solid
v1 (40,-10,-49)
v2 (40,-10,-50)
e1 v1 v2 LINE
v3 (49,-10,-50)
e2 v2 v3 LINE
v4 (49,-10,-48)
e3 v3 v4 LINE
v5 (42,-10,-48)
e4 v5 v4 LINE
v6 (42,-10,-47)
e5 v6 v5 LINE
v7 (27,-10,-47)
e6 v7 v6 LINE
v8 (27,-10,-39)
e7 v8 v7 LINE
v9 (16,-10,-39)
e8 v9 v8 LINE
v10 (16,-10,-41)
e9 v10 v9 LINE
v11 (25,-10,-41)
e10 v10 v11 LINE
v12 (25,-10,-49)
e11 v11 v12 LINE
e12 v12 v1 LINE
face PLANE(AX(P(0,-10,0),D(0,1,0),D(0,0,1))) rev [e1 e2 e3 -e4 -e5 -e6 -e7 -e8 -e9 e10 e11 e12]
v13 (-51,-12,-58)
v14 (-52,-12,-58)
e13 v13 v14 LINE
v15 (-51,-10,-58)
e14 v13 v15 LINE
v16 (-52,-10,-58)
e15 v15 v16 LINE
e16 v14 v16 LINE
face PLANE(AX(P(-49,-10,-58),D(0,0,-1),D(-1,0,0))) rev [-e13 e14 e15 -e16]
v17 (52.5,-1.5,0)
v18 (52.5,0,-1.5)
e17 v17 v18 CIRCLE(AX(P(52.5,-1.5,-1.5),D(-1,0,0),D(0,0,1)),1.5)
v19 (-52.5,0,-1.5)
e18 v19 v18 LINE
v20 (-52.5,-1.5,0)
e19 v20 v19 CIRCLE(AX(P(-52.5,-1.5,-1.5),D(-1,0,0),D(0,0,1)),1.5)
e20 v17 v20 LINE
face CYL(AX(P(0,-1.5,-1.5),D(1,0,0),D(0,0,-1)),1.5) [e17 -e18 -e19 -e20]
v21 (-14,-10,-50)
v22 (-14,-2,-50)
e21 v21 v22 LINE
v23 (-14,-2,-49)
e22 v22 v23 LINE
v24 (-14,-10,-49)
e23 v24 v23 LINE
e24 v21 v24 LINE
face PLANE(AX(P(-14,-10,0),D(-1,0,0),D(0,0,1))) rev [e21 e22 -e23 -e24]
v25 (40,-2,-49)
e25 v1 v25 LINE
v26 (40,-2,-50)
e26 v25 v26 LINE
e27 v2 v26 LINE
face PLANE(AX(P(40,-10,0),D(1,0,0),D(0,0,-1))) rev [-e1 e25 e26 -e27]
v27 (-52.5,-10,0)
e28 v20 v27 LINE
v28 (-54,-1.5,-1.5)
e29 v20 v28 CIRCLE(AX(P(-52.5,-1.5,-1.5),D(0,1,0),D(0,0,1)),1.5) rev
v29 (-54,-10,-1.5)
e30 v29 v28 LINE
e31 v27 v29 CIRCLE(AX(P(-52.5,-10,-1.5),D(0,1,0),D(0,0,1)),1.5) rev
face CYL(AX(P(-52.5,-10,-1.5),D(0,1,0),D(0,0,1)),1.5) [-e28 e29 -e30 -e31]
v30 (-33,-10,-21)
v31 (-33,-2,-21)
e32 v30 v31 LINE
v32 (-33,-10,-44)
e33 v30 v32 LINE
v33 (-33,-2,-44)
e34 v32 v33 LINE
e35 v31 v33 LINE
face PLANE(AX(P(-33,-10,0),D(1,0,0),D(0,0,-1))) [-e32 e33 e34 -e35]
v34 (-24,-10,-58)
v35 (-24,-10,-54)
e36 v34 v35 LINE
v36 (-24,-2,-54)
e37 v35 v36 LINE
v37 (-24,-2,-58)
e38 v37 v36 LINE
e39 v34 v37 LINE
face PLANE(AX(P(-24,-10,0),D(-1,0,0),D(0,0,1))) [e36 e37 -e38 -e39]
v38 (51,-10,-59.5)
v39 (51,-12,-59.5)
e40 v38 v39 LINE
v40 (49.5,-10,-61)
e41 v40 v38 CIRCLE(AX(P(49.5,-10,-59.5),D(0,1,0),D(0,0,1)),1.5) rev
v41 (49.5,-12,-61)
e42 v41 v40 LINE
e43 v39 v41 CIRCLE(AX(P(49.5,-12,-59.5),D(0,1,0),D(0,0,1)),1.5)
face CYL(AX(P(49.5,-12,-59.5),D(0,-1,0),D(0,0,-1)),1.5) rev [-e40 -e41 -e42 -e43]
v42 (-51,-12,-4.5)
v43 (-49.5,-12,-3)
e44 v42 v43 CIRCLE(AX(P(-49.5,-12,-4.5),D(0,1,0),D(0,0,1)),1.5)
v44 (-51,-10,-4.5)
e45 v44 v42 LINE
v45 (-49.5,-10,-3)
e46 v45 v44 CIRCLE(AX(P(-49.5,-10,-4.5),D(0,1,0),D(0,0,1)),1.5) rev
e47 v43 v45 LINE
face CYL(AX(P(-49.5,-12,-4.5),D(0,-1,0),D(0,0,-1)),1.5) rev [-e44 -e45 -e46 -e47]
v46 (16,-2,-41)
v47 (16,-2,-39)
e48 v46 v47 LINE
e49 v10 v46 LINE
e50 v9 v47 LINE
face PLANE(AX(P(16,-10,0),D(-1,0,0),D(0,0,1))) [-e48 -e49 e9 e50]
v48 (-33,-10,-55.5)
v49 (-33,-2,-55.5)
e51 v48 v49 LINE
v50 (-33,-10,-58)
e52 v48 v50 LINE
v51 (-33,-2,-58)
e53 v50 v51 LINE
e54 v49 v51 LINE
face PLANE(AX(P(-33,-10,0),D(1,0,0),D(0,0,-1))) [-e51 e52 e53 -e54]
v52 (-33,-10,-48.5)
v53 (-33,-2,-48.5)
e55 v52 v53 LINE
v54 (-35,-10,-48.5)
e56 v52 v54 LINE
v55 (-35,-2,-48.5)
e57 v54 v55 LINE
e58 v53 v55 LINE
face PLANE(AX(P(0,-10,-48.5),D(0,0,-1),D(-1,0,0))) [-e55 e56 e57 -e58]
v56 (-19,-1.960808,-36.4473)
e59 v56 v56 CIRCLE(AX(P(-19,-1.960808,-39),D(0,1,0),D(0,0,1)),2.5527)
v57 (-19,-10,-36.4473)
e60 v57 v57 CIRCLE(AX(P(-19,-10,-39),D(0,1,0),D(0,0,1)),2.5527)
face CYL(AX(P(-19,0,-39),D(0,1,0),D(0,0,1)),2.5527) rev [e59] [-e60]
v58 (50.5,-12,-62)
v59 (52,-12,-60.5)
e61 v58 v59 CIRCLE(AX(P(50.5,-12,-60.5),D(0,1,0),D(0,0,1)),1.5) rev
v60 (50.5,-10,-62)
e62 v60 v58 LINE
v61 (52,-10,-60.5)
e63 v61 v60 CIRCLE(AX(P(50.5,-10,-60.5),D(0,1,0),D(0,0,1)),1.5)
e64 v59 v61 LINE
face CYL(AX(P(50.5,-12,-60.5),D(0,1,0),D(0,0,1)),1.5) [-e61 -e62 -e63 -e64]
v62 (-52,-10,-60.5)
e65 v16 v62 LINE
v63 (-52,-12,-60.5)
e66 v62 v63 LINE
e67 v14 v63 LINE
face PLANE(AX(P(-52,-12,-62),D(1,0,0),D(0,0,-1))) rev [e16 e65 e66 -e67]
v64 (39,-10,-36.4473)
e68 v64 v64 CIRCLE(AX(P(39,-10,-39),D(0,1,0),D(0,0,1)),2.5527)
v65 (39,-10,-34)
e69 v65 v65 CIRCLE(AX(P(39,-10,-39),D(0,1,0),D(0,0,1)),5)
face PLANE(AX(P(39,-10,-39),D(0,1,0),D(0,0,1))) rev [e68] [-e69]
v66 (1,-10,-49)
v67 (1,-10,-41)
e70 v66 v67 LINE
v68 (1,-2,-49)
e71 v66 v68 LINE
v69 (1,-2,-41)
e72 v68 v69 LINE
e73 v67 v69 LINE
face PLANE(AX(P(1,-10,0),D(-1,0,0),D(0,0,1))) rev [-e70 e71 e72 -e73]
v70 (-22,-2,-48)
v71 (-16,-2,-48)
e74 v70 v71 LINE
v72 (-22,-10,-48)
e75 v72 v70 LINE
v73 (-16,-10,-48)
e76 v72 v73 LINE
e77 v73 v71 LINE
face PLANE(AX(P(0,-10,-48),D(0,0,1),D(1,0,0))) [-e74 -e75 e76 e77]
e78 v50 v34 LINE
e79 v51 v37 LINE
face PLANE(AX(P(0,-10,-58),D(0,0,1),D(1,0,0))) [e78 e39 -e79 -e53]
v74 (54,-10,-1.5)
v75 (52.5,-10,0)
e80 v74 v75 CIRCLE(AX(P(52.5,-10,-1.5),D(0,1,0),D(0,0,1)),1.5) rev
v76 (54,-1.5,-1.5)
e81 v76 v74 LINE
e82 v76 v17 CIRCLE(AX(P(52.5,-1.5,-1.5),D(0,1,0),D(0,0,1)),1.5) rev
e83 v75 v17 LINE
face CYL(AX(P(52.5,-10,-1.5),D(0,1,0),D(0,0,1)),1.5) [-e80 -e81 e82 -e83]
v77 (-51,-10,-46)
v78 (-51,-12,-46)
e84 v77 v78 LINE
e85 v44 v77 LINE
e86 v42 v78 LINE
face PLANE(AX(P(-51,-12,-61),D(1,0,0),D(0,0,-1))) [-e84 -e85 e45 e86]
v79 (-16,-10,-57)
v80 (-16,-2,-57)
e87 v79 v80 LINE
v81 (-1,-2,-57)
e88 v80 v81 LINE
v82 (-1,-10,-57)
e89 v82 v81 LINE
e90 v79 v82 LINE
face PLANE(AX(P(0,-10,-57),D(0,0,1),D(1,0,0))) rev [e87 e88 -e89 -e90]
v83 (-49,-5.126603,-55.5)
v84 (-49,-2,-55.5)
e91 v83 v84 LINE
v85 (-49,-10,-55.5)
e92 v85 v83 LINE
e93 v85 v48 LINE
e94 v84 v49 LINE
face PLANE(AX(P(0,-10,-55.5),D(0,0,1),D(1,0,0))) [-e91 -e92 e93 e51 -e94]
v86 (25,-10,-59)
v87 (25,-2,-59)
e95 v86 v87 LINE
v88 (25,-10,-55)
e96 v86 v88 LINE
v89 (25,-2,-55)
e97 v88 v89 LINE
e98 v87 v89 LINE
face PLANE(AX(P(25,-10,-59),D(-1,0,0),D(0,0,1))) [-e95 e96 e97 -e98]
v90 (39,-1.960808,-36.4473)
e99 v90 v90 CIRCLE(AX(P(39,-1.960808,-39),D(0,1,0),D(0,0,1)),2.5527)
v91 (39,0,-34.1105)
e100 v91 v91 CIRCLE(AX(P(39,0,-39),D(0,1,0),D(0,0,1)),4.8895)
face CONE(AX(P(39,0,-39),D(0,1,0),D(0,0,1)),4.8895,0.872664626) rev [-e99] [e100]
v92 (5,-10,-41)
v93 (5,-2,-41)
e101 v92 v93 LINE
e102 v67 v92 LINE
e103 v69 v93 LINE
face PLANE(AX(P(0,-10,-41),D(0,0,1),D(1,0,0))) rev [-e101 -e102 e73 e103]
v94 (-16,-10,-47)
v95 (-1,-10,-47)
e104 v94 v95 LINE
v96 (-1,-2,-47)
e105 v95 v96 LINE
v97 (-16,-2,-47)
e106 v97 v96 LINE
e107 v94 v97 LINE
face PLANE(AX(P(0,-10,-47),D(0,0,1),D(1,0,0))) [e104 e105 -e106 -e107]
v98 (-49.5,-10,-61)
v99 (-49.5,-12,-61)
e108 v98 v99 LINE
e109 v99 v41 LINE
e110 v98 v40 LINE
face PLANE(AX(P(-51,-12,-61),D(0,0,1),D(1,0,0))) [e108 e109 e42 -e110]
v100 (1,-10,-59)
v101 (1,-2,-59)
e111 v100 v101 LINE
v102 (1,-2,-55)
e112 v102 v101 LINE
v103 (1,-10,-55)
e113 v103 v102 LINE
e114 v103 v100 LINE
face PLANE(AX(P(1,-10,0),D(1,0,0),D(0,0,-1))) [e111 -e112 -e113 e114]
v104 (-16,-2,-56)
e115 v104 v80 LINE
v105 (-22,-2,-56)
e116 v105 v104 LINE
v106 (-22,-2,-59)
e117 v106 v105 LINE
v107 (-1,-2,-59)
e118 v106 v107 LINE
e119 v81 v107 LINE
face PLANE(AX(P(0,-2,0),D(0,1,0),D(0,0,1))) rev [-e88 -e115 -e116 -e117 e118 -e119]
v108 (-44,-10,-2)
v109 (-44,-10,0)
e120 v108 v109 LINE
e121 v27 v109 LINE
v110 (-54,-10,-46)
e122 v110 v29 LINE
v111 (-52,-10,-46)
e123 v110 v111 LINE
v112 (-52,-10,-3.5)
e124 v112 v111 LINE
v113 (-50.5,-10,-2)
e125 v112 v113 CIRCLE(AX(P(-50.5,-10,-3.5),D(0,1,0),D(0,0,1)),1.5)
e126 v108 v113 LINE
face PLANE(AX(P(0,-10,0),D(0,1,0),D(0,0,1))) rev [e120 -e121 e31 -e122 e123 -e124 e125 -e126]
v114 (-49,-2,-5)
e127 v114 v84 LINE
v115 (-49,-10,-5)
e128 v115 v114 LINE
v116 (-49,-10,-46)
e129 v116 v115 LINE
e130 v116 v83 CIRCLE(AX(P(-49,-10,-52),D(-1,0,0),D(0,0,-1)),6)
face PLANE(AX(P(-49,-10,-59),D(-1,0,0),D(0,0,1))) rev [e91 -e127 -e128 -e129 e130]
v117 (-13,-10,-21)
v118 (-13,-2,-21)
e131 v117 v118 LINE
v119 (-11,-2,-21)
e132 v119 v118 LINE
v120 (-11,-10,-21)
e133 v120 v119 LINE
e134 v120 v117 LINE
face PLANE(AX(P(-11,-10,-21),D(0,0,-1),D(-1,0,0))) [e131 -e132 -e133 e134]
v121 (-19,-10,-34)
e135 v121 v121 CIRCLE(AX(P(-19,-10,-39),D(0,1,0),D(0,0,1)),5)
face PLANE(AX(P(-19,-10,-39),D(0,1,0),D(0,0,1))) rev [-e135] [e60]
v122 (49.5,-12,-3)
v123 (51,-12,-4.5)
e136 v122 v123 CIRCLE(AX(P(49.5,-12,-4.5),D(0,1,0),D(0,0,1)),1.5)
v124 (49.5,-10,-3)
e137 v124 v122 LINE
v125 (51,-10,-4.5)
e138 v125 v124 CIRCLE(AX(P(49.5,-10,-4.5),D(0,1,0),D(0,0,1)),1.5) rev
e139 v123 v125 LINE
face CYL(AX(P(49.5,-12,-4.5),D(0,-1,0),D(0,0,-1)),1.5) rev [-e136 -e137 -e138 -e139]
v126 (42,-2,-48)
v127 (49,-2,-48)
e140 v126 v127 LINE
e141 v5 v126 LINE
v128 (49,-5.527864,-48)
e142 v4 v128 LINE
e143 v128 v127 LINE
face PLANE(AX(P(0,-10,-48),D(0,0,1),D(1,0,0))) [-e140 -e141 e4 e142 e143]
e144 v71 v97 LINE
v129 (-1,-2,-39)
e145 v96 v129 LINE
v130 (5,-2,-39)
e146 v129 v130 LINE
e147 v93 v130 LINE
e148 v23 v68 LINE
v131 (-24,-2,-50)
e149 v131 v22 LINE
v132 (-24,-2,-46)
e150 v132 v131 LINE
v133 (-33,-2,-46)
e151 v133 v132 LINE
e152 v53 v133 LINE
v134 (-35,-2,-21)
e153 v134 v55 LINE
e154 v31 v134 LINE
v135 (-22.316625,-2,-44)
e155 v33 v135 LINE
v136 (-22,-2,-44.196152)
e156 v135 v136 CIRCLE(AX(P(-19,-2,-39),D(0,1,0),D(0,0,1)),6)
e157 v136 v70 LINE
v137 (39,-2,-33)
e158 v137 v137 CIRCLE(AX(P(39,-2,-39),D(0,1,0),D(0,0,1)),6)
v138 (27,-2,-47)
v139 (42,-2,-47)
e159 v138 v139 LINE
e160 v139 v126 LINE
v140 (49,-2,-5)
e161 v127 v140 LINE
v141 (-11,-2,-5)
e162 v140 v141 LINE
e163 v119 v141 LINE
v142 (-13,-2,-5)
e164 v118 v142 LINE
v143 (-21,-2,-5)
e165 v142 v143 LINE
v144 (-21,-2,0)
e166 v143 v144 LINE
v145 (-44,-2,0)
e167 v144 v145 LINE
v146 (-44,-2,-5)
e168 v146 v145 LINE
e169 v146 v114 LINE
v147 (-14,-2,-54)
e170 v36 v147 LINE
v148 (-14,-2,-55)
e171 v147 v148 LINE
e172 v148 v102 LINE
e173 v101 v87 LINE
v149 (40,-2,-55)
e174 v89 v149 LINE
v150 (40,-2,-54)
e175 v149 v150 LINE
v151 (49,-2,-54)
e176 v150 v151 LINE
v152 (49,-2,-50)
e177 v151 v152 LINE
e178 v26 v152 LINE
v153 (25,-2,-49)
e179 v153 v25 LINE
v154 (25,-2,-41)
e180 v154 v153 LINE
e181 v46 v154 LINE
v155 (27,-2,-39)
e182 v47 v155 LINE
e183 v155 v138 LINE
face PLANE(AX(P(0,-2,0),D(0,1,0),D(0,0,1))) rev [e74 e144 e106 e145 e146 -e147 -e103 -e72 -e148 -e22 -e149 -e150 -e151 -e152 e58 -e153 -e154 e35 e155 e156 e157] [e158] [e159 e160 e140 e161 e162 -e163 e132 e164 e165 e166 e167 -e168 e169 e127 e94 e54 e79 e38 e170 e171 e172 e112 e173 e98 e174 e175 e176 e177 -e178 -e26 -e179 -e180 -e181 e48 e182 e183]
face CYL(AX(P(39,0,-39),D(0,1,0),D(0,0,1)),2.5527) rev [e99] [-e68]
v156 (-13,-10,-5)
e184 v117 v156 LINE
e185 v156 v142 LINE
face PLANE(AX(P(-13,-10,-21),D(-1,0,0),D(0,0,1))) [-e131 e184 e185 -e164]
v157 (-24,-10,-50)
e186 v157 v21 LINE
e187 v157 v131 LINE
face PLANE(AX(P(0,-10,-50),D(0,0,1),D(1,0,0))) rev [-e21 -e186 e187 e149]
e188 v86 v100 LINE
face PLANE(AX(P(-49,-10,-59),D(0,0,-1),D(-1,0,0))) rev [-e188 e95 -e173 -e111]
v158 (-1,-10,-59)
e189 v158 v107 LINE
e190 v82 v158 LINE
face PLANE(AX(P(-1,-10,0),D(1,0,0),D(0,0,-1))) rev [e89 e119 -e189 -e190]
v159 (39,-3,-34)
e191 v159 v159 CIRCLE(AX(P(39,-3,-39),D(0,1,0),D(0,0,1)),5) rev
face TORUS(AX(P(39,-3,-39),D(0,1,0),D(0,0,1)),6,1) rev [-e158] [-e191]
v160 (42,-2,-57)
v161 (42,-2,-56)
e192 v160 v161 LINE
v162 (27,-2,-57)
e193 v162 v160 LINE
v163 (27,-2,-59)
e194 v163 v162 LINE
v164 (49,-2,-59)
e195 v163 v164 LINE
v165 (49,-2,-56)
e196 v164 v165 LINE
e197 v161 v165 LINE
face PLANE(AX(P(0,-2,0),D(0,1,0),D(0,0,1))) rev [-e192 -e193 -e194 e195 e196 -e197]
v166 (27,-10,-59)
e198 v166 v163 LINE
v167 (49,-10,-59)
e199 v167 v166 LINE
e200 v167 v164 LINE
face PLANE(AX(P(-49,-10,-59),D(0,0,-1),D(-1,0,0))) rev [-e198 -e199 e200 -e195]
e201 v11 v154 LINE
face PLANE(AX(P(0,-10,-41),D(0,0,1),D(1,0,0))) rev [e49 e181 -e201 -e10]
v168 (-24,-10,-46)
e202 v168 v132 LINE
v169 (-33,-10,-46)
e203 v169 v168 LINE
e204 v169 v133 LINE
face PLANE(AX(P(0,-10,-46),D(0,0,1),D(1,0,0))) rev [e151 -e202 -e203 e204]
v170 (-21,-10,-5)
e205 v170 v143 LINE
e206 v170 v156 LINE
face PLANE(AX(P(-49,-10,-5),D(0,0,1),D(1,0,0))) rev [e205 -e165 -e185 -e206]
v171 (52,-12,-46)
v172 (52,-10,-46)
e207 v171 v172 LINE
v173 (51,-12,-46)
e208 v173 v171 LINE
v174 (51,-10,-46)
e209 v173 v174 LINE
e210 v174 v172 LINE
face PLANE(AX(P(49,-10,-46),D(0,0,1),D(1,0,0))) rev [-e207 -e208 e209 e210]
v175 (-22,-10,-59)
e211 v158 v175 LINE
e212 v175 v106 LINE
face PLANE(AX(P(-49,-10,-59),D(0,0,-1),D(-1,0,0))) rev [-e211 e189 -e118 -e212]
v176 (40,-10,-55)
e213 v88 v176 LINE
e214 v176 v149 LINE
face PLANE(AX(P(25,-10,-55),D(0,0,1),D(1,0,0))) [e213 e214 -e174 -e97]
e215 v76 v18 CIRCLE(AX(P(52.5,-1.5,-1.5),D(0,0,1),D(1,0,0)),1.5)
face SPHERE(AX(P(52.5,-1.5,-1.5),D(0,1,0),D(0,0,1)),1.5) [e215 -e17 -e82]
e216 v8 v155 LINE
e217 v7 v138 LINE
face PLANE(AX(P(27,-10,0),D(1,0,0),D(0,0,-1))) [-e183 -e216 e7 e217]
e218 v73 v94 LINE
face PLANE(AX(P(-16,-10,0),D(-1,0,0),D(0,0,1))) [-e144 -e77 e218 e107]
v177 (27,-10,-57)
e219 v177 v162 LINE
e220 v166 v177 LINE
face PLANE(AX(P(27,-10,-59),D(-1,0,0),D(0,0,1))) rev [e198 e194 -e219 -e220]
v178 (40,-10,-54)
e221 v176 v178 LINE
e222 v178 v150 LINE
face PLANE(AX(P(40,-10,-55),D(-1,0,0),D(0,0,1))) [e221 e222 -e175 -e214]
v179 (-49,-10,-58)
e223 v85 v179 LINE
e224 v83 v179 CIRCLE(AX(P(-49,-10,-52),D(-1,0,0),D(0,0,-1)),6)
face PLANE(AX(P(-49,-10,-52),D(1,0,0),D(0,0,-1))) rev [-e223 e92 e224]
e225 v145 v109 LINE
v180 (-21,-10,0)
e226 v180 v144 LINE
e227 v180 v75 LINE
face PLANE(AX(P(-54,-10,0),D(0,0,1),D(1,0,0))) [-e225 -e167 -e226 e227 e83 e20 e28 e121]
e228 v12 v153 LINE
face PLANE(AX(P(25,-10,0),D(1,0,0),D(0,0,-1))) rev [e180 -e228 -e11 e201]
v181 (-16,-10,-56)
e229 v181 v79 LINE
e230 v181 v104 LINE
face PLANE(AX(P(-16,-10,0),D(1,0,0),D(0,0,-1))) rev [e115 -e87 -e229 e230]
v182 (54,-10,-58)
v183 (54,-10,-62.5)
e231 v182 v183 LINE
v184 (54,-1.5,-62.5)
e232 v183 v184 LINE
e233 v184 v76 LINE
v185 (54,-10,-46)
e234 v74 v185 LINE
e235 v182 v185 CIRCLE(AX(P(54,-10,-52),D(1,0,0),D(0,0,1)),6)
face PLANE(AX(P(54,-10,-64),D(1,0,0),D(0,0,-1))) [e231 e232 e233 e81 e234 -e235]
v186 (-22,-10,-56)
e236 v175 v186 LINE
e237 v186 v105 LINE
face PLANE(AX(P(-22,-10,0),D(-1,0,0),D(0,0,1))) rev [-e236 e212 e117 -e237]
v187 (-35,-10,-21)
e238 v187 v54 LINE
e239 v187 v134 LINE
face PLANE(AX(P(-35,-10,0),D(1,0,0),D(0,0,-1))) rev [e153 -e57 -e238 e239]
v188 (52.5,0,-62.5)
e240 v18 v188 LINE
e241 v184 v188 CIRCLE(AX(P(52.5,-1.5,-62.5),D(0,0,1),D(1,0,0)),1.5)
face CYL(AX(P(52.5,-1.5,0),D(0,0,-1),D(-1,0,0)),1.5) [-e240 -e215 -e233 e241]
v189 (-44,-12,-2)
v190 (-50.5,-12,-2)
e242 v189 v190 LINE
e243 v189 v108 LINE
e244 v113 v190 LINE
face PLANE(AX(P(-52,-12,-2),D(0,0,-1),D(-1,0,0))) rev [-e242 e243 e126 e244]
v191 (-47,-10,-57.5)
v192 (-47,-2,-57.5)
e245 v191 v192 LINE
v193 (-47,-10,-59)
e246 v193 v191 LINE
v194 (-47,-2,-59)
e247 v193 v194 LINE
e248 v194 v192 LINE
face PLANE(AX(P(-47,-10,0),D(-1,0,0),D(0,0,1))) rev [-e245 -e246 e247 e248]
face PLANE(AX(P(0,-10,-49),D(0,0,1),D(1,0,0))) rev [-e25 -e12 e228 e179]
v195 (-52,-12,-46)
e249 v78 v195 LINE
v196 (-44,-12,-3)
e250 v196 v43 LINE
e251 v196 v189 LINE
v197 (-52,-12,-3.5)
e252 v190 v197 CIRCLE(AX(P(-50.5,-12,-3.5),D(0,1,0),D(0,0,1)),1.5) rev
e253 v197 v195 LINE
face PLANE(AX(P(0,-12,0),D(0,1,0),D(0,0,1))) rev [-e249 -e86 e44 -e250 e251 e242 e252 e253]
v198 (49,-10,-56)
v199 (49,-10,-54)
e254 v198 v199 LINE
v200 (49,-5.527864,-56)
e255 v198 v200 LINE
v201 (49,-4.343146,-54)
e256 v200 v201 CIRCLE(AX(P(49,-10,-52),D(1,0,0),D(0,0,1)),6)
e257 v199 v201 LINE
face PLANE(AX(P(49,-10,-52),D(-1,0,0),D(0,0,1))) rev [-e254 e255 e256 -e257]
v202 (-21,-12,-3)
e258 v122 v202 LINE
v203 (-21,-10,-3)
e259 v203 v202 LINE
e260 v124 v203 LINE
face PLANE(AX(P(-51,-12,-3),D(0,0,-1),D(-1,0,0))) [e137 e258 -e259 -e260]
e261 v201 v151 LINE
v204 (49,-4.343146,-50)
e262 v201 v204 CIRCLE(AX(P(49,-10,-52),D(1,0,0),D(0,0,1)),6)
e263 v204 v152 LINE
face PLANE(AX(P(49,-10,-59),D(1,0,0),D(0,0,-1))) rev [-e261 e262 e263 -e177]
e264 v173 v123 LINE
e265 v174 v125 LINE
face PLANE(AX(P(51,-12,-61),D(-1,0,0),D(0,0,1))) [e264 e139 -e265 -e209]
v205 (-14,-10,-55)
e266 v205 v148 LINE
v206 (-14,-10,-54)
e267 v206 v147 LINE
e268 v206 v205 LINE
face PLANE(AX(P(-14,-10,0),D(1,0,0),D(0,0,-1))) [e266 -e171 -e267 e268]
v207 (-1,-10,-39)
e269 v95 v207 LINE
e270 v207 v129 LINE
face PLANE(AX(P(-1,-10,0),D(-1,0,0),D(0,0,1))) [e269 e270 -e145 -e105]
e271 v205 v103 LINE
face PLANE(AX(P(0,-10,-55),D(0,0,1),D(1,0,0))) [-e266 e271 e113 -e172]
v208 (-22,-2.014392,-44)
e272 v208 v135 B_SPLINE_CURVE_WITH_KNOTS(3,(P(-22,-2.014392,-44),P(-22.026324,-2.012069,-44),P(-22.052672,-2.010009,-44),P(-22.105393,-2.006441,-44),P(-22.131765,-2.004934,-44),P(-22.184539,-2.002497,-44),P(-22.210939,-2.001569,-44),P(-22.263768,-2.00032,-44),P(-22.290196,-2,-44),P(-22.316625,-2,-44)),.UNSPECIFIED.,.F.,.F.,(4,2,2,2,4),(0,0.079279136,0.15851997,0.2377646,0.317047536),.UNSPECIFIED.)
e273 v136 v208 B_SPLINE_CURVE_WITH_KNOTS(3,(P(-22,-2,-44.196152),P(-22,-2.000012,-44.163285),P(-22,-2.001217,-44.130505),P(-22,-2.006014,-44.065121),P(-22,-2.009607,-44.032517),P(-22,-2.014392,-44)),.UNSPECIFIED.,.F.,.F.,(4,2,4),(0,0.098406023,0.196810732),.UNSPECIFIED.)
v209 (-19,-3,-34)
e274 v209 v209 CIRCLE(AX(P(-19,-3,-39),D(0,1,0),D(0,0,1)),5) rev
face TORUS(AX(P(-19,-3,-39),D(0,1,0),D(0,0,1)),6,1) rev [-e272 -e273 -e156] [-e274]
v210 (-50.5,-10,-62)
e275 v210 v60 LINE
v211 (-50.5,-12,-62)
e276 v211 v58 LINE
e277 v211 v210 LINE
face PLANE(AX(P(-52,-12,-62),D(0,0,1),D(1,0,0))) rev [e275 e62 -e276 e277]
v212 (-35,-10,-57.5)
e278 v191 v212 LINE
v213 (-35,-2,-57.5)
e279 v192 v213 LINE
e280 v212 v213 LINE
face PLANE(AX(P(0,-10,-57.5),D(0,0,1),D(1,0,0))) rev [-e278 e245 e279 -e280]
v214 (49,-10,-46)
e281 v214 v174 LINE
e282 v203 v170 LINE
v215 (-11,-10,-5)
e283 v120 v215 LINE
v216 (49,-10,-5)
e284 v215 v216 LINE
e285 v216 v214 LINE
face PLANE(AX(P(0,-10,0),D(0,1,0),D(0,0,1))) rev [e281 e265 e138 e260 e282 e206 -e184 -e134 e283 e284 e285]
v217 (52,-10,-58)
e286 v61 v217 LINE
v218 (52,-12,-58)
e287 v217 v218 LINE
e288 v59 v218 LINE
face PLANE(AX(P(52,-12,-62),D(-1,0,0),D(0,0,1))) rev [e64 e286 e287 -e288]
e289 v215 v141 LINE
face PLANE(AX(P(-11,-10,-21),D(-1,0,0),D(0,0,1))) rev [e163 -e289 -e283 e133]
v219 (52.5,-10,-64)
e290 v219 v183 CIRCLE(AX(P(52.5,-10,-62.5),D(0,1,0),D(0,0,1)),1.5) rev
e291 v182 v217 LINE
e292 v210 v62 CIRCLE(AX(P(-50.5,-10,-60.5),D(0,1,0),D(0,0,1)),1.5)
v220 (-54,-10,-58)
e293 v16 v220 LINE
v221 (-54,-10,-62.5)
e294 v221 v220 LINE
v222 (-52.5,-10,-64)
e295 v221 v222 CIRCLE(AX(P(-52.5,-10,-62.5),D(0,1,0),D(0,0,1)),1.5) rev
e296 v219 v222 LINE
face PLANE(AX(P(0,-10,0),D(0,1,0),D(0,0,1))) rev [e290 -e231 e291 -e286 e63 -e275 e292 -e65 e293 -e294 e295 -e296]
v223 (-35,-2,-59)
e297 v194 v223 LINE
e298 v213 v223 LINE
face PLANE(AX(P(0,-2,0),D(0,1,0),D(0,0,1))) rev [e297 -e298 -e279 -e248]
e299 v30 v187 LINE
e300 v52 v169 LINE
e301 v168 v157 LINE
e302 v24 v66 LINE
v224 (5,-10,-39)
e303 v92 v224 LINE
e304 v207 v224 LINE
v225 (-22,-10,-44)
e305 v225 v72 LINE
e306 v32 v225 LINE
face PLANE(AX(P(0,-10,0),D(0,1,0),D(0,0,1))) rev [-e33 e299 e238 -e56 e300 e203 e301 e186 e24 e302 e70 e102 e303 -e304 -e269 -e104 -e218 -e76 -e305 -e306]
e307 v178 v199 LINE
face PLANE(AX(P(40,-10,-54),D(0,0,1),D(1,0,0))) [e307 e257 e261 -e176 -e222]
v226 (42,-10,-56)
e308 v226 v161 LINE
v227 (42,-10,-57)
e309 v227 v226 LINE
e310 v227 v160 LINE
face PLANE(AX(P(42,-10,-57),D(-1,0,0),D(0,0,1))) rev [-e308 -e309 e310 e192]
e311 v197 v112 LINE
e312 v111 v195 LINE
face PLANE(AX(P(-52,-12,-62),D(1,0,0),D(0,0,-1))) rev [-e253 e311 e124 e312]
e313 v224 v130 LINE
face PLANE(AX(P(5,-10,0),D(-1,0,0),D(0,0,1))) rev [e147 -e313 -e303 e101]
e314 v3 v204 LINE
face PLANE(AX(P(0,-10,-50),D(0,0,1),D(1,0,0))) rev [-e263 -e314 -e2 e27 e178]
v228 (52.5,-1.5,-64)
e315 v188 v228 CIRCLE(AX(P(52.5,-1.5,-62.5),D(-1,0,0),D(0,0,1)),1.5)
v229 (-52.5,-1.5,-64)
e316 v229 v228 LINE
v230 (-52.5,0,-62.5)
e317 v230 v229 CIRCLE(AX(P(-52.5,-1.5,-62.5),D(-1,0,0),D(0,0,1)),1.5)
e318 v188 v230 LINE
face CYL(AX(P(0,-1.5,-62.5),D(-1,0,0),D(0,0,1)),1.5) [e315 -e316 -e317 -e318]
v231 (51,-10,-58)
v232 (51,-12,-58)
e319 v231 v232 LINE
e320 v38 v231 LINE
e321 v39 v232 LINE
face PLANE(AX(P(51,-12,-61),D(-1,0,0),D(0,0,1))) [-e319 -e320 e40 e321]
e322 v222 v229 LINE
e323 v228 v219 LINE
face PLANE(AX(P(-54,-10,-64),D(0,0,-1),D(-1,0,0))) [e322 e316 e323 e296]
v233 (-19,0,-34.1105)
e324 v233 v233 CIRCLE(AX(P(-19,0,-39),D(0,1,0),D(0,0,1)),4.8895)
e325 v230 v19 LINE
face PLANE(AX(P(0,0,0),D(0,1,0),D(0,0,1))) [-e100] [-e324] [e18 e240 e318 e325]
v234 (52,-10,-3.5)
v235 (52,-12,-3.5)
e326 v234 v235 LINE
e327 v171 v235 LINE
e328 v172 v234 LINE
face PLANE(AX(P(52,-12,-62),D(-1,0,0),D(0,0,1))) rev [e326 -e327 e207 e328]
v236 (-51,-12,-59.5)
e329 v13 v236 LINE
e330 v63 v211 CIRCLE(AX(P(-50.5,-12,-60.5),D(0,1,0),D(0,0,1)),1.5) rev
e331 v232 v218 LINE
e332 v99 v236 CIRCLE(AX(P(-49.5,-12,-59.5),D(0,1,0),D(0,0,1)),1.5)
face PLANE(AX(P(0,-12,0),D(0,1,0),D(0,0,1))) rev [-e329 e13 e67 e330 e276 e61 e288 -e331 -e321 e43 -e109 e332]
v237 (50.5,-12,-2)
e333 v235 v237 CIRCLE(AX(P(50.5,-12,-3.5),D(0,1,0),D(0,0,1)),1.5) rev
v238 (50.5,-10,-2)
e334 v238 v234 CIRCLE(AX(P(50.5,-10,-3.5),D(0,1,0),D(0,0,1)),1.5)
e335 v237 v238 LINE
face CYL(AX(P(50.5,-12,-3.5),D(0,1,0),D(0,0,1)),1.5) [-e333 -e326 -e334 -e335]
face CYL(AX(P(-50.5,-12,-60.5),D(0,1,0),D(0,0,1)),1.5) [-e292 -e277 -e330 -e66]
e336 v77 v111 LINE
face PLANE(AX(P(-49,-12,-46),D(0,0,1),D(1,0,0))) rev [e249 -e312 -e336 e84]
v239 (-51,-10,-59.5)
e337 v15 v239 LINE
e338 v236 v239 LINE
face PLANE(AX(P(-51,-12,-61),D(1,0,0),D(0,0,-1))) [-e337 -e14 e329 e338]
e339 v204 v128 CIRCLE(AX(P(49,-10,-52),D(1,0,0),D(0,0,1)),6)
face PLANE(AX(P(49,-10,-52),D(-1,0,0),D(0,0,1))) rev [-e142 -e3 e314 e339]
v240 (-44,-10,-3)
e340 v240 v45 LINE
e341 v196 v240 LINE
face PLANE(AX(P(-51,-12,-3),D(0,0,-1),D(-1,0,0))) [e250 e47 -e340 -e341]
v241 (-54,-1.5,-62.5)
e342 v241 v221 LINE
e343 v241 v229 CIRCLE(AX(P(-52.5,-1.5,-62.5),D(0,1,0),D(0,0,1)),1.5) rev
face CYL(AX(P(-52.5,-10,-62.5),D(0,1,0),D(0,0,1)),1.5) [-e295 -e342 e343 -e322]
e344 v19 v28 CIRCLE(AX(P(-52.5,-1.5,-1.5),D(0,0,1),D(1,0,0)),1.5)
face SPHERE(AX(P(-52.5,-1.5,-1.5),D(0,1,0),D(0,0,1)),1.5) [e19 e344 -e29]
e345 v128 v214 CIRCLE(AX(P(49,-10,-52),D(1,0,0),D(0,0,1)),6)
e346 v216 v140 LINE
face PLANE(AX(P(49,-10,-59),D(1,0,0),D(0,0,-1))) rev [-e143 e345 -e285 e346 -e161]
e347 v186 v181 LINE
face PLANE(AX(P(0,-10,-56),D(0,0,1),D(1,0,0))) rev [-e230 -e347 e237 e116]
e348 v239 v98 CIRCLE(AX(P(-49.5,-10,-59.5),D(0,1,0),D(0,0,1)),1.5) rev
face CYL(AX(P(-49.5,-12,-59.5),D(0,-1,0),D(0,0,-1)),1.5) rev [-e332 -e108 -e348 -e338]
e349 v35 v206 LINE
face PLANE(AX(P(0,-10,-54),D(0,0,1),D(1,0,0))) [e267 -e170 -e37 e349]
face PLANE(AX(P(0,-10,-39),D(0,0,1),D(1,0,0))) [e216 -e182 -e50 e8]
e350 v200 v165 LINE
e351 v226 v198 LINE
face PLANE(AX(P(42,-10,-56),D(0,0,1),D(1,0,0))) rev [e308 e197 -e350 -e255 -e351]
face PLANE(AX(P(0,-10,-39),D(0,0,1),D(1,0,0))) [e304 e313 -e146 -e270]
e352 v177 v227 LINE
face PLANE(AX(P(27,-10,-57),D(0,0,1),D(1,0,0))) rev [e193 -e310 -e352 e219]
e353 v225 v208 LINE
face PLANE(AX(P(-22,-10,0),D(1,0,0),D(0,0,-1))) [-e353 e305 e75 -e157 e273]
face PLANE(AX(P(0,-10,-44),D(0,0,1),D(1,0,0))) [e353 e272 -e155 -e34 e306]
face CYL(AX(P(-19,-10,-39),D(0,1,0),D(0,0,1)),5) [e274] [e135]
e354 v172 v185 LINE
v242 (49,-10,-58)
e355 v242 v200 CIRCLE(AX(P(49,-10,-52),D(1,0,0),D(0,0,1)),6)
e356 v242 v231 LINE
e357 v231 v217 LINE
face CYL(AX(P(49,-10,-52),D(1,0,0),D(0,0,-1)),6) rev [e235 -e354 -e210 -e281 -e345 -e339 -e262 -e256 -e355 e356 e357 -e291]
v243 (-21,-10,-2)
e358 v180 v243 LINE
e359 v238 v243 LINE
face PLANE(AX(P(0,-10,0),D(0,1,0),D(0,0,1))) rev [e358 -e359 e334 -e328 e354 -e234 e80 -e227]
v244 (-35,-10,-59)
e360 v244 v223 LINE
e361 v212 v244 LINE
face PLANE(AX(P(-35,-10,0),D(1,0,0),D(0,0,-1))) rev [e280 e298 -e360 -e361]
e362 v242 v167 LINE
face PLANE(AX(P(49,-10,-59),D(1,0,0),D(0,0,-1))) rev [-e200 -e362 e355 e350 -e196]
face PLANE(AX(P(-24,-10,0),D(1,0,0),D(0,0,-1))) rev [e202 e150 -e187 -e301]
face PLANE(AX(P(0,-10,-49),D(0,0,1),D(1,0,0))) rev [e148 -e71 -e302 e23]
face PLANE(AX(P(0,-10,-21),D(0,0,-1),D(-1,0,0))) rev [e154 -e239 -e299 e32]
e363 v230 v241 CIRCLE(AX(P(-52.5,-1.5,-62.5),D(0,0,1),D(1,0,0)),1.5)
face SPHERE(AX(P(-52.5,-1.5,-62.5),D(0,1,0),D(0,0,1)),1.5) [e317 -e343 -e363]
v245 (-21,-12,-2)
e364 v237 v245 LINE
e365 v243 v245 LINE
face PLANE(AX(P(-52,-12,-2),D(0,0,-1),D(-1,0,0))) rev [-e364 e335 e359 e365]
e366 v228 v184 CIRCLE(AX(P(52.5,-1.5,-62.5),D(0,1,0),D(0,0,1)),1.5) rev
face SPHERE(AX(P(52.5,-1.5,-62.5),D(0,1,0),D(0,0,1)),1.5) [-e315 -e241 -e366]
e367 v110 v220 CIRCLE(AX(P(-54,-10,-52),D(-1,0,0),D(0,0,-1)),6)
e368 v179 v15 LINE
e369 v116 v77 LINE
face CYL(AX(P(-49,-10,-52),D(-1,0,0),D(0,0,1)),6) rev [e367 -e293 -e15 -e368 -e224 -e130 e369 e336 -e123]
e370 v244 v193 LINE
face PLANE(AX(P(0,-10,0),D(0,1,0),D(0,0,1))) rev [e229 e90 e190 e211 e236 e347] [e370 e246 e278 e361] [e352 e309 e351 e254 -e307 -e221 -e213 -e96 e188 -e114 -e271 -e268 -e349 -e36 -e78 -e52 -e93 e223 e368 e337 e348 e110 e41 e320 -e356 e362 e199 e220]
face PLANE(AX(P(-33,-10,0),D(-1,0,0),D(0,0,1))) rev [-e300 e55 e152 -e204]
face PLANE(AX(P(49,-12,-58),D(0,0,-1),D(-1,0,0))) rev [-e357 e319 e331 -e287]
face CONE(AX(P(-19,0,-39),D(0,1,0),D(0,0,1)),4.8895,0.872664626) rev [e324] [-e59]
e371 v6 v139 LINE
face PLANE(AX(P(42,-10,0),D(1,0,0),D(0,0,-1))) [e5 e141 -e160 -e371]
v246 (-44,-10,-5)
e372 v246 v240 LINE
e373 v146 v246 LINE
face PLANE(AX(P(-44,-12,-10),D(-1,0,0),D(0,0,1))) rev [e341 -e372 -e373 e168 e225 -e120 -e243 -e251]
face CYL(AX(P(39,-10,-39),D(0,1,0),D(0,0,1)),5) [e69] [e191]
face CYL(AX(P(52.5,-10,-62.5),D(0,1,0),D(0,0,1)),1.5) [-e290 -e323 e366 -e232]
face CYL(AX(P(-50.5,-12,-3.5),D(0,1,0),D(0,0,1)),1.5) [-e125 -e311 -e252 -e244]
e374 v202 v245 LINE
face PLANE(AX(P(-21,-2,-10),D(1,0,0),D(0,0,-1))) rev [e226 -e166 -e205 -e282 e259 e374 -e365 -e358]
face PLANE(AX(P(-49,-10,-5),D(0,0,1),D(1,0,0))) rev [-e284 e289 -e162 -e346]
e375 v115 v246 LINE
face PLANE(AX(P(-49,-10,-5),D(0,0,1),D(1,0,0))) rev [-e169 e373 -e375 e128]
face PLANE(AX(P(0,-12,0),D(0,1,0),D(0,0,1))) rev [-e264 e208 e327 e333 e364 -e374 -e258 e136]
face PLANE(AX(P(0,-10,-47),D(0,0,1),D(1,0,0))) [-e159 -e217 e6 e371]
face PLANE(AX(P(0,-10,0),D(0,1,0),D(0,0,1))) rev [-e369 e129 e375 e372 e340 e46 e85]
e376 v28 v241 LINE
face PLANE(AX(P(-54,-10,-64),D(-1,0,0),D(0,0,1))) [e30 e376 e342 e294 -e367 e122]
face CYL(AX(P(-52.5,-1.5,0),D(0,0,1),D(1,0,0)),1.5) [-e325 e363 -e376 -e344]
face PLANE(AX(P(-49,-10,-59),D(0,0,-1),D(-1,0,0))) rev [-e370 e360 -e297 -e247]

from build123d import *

# Parameters (mm, degrees)
BASIC_BOX_OUTLINE_W                                = 108
BASIC_BOX_OUTLINE_H                                = 64
BASIC_BOX_OUTLINE_W_2                              = 98
BASIC_BOX_OUTLINE_H_2                              = 54
SIDE_WALLS_DEPTH                                   = 10
BOTTOM_START                                       = -2
BOTTOM_WALL_OUTLINE_W                              = 98
BOTTOM_WALL_OUTLINE_H                              = 54
BOTTOM_WALL_DEPTH                                  = 2
INNER_WALLS_TO_HOLD_DEVICES_W                      = 2
INNER_WALLS_TO_HOLD_DEVICES_H                      = 16
INSIDE_WALLS_DEPTH                                 = 10
SCREW_HOLES_R                                      = 5
SCREWS_DEPTH                                       = 10
ALIGNMENT_W                                        = 104
ALIGNMENT_H                                        = 60
ALIGNMENT_W_2                                      = 102
ALIGNMENT_H_2                                      = 58
ALIGNMENT_BUMP_DEPTH                               = 2
LEFT_START                                         = -5
LEFT_HOLE_DEPTH                                    = 5
RIGHT_HOLE_DEPTH                                   = 5
SKETCH6_W                                          = 23
SKETCH6_H                                          = 10
CUT_EXTRUDE2_DEPTH                                 = 10
CSK_FOR_10_FLAT_HEAD_MACHINE_SCREW_100_D           = 5.1054
CSK_FOR_10_FLAT_HEAD_MACHINE_SCREW_100_CSINK_D     = 9.779
CSK_FOR_10_FLAT_HEAD_MACHINE_SCREW_100_CSINK_ANGLE = 100
FILLET1_R                                          = 1.5
FILLET2_R                                          = 1.5
FILLET3_R                                          = 1


# Read off the part's stored shape, not the designer's step: bottom wall
with BuildPart() as part:
    # basic box outline → side walls (new body)
    with BuildSketch(Plane(origin=(0, 0, 0), x_dir=(1, 0, 0), z_dir=(0, 1, 0))):
        with Locations((0, 32)):
            Rectangle(BASIC_BOX_OUTLINE_W, BASIC_BOX_OUTLINE_H)
        with Locations((0, 32)):
            Rectangle(BASIC_BOX_OUTLINE_W_2, BASIC_BOX_OUTLINE_H_2, mode=Mode.SUBTRACT)
    extrude(amount=-SIDE_WALLS_DEPTH)

    # bottom wall outline → bottom wall (add)
    with BuildSketch(Plane(origin=(0, 0, 0), x_dir=(1, 0, 0), z_dir=(0, 1, 0)).offset(BOTTOM_START)):
        with Locations((0, 32)):
            Rectangle(BOTTOM_WALL_OUTLINE_W, BOTTOM_WALL_OUTLINE_H)
    extrude(amount=BOTTOM_WALL_DEPTH)

    # inner walls to hold devices → inside walls (add)
    with BuildSketch(Plane(origin=(0, 0, 0), x_dir=(1, 0, 0), z_dir=(0, 1, 0))):
        Polygon((-47, 59), (-49, 59), (-49, 55.5), (-33, 55.5), (-33, 58), (-24, 58), (-24, 54), (-14, 54), (-14, 55), (1, 55), (1, 59), (-1, 59), (-1, 57), (-16, 57), (-16, 56), (-22, 56), (-22, 59), (-35, 59), (-35, 57.5), (-47, 57.5), align=None)
        Polygon((27, 59), (25, 59), (25, 55), (40, 55), (40, 54), (49, 54), (49, 56), (42, 56), (42, 57), (27, 57), align=None)
        Polygon((49, 50), (40, 50), (40, 49), (25, 49), (25, 41), (16, 41), (16, 39), (27, 39), (27, 47), (42, 47), (42, 48), (49, 48), align=None)
        Polygon((-14, 50), (-24, 50), (-24, 46), (-33, 46), (-33, 48.5), (-35, 48.5), (-35, 21), (-33, 21), (-33, 44), (-22, 44), (-22, 48), (-16, 48), (-16, 47), (-1, 47), (-1, 39), (5, 39), (5, 41), (1, 41), (1, 49), (-14, 49), align=None)
        with Locations((-12, 13)):
            Rectangle(INNER_WALLS_TO_HOLD_DEVICES_W, INNER_WALLS_TO_HOLD_DEVICES_H)
    extrude(amount=-INSIDE_WALLS_DEPTH)

    # screw holes → screws (add)
    with BuildSketch(Plane(origin=(0, 0, 0), x_dir=(1, 0, 0), z_dir=(0, 1, 0))):
        with Locations(Location((-19, 39, 0), (0, 0, 270))):
            Circle(SCREW_HOLES_R)
        with Locations(Location((39, 39, 0), (0, 0, 270))):
            Circle(SCREW_HOLES_R)
    extrude(amount=-SCREWS_DEPTH)

    # alignment → alignment bump (add)
    with BuildSketch(Plane(origin=(0, -10, 0), x_dir=(-1, 0, 0), z_dir=(0, -1, 0))):
        with Locations((0, 32)):
            Rectangle(ALIGNMENT_W, ALIGNMENT_H)
        with Locations((0, 32)):
            Rectangle(ALIGNMENT_W_2, ALIGNMENT_H_2, mode=Mode.SUBTRACT)
    extrude(amount=ALIGNMENT_BUMP_DEPTH)

    # hole 1 → left hole (cut)
    with BuildSketch(Plane(origin=(54, 0, 0), x_dir=(0, 0, -1), z_dir=(1, 0, 0)).offset(LEFT_START)):
        with BuildLine():
            Line((46, -10), (46, -12))
            Line((46, -12), (58, -12))
            Line((58, -12), (58, -10))
            ThreePointArc((58, -10), (52, -4), (46, -10))
        make_face()
    extrude(amount=LEFT_HOLE_DEPTH, mode=Mode.SUBTRACT)

    # hole 2 → right hole (cut)
    with BuildSketch(Plane.ZY.offset(54)):
        with BuildLine():
            Line((-58, -10), (-58, -12))
            Line((-58, -12), (-46, -12))
            Line((-46, -12), (-46, -10))
            ThreePointArc((-46, -10), (-52, -4), (-58, -10))
        make_face()
    extrude(amount=-RIGHT_HOLE_DEPTH, mode=Mode.SUBTRACT)

    # Sketch6 → Cut-Extrude2 (cut)
    with BuildSketch(Plane.XY):
        with Locations((-32.5, -7)):
            Rectangle(SKETCH6_W, SKETCH6_H)
    extrude(amount=-CUT_EXTRUDE2_DEPTH, mode=Mode.SUBTRACT)

    # CSK for #10 Flat Head Machine Screw (100)1 (through all)
    with Locations(Plane(origin=(0, 0, 0), x_dir=(1, 0, 0), z_dir=(0, 1, 0))):
        with Locations((-19, 39), (39, 39)):
            CounterSinkHole(CSK_FOR_10_FLAT_HEAD_MACHINE_SCREW_100_D / 2, CSK_FOR_10_FLAT_HEAD_MACHINE_SCREW_100_CSINK_D / 2, counter_sink_angle=CSK_FOR_10_FLAT_HEAD_MACHINE_SCREW_100_CSINK_ANGLE)

    # Fillet1
    fillet1_edges = [part.edges().sort_by_distance(p)[0] for p in [
        (-52, -11, -2),
        (-52, -11, -62),
        (52, -11, -62),
        (52, -11, -2),
        (-51, -11, -61),
        (51, -11, -61),
        (51, -11, -3),
        (-51, -11, -3),
        (-54, -5, -64),
        (54, -5, -64),
        (54, -5, 0),
        (-54, -5, 0),
    ]]
    fillet(fillet1_edges, radius=FILLET1_R)

    # Fillet2
    fillet2_edges = [part.edges().sort_by_distance(p)[0] for p in [
        (0, 0, -64),
        (-54, 0, -32),
        (0, 0, 0),
        (54, 0, -32),
        (-53.560660172, 0, -0.439339828),
        (53.560660172, 0, -0.439339828),
        (53.560660172, 0, -63.560660172),
        (-53.560660172, 0, -63.560660172),
    ]]
    fillet(fillet2_edges, radius=FILLET2_R)

    # Fillet3
    # the kernel refuses this fillet: 1 mm, written as the material it adds along each edge
    with BuildSketch(Plane(origin=(-19, -2, -39), x_dir=(0, 0, 1), z_dir=(-1, 0, 0))) as fillet3_piece_1:
        with BuildLine():
            CenterArc((5 + FILLET3_R, -FILLET3_R), FILLET3_R, 90, 90)
            Line((5, -FILLET3_R), (5, 0))
            Line((5, 0), (5 + FILLET3_R, 0))
        make_face()
    revolve(axis=Axis((-19, -2, -39), (0, 1, 0)))
    with BuildSketch(Plane(origin=(39, -2, -39), x_dir=(0, 0, 1), z_dir=(-1, 0, 0))) as fillet3_piece_2:
        with BuildLine():
            CenterArc((5 + FILLET3_R, -FILLET3_R), FILLET3_R, 90, 90)
            Line((5, -FILLET3_R), (5, 0))
            Line((5, 0), (5 + FILLET3_R, 0))
        make_face()
    revolve(axis=Axis((39, -2, -39), (0, 1, 0)))


solid = part.part
